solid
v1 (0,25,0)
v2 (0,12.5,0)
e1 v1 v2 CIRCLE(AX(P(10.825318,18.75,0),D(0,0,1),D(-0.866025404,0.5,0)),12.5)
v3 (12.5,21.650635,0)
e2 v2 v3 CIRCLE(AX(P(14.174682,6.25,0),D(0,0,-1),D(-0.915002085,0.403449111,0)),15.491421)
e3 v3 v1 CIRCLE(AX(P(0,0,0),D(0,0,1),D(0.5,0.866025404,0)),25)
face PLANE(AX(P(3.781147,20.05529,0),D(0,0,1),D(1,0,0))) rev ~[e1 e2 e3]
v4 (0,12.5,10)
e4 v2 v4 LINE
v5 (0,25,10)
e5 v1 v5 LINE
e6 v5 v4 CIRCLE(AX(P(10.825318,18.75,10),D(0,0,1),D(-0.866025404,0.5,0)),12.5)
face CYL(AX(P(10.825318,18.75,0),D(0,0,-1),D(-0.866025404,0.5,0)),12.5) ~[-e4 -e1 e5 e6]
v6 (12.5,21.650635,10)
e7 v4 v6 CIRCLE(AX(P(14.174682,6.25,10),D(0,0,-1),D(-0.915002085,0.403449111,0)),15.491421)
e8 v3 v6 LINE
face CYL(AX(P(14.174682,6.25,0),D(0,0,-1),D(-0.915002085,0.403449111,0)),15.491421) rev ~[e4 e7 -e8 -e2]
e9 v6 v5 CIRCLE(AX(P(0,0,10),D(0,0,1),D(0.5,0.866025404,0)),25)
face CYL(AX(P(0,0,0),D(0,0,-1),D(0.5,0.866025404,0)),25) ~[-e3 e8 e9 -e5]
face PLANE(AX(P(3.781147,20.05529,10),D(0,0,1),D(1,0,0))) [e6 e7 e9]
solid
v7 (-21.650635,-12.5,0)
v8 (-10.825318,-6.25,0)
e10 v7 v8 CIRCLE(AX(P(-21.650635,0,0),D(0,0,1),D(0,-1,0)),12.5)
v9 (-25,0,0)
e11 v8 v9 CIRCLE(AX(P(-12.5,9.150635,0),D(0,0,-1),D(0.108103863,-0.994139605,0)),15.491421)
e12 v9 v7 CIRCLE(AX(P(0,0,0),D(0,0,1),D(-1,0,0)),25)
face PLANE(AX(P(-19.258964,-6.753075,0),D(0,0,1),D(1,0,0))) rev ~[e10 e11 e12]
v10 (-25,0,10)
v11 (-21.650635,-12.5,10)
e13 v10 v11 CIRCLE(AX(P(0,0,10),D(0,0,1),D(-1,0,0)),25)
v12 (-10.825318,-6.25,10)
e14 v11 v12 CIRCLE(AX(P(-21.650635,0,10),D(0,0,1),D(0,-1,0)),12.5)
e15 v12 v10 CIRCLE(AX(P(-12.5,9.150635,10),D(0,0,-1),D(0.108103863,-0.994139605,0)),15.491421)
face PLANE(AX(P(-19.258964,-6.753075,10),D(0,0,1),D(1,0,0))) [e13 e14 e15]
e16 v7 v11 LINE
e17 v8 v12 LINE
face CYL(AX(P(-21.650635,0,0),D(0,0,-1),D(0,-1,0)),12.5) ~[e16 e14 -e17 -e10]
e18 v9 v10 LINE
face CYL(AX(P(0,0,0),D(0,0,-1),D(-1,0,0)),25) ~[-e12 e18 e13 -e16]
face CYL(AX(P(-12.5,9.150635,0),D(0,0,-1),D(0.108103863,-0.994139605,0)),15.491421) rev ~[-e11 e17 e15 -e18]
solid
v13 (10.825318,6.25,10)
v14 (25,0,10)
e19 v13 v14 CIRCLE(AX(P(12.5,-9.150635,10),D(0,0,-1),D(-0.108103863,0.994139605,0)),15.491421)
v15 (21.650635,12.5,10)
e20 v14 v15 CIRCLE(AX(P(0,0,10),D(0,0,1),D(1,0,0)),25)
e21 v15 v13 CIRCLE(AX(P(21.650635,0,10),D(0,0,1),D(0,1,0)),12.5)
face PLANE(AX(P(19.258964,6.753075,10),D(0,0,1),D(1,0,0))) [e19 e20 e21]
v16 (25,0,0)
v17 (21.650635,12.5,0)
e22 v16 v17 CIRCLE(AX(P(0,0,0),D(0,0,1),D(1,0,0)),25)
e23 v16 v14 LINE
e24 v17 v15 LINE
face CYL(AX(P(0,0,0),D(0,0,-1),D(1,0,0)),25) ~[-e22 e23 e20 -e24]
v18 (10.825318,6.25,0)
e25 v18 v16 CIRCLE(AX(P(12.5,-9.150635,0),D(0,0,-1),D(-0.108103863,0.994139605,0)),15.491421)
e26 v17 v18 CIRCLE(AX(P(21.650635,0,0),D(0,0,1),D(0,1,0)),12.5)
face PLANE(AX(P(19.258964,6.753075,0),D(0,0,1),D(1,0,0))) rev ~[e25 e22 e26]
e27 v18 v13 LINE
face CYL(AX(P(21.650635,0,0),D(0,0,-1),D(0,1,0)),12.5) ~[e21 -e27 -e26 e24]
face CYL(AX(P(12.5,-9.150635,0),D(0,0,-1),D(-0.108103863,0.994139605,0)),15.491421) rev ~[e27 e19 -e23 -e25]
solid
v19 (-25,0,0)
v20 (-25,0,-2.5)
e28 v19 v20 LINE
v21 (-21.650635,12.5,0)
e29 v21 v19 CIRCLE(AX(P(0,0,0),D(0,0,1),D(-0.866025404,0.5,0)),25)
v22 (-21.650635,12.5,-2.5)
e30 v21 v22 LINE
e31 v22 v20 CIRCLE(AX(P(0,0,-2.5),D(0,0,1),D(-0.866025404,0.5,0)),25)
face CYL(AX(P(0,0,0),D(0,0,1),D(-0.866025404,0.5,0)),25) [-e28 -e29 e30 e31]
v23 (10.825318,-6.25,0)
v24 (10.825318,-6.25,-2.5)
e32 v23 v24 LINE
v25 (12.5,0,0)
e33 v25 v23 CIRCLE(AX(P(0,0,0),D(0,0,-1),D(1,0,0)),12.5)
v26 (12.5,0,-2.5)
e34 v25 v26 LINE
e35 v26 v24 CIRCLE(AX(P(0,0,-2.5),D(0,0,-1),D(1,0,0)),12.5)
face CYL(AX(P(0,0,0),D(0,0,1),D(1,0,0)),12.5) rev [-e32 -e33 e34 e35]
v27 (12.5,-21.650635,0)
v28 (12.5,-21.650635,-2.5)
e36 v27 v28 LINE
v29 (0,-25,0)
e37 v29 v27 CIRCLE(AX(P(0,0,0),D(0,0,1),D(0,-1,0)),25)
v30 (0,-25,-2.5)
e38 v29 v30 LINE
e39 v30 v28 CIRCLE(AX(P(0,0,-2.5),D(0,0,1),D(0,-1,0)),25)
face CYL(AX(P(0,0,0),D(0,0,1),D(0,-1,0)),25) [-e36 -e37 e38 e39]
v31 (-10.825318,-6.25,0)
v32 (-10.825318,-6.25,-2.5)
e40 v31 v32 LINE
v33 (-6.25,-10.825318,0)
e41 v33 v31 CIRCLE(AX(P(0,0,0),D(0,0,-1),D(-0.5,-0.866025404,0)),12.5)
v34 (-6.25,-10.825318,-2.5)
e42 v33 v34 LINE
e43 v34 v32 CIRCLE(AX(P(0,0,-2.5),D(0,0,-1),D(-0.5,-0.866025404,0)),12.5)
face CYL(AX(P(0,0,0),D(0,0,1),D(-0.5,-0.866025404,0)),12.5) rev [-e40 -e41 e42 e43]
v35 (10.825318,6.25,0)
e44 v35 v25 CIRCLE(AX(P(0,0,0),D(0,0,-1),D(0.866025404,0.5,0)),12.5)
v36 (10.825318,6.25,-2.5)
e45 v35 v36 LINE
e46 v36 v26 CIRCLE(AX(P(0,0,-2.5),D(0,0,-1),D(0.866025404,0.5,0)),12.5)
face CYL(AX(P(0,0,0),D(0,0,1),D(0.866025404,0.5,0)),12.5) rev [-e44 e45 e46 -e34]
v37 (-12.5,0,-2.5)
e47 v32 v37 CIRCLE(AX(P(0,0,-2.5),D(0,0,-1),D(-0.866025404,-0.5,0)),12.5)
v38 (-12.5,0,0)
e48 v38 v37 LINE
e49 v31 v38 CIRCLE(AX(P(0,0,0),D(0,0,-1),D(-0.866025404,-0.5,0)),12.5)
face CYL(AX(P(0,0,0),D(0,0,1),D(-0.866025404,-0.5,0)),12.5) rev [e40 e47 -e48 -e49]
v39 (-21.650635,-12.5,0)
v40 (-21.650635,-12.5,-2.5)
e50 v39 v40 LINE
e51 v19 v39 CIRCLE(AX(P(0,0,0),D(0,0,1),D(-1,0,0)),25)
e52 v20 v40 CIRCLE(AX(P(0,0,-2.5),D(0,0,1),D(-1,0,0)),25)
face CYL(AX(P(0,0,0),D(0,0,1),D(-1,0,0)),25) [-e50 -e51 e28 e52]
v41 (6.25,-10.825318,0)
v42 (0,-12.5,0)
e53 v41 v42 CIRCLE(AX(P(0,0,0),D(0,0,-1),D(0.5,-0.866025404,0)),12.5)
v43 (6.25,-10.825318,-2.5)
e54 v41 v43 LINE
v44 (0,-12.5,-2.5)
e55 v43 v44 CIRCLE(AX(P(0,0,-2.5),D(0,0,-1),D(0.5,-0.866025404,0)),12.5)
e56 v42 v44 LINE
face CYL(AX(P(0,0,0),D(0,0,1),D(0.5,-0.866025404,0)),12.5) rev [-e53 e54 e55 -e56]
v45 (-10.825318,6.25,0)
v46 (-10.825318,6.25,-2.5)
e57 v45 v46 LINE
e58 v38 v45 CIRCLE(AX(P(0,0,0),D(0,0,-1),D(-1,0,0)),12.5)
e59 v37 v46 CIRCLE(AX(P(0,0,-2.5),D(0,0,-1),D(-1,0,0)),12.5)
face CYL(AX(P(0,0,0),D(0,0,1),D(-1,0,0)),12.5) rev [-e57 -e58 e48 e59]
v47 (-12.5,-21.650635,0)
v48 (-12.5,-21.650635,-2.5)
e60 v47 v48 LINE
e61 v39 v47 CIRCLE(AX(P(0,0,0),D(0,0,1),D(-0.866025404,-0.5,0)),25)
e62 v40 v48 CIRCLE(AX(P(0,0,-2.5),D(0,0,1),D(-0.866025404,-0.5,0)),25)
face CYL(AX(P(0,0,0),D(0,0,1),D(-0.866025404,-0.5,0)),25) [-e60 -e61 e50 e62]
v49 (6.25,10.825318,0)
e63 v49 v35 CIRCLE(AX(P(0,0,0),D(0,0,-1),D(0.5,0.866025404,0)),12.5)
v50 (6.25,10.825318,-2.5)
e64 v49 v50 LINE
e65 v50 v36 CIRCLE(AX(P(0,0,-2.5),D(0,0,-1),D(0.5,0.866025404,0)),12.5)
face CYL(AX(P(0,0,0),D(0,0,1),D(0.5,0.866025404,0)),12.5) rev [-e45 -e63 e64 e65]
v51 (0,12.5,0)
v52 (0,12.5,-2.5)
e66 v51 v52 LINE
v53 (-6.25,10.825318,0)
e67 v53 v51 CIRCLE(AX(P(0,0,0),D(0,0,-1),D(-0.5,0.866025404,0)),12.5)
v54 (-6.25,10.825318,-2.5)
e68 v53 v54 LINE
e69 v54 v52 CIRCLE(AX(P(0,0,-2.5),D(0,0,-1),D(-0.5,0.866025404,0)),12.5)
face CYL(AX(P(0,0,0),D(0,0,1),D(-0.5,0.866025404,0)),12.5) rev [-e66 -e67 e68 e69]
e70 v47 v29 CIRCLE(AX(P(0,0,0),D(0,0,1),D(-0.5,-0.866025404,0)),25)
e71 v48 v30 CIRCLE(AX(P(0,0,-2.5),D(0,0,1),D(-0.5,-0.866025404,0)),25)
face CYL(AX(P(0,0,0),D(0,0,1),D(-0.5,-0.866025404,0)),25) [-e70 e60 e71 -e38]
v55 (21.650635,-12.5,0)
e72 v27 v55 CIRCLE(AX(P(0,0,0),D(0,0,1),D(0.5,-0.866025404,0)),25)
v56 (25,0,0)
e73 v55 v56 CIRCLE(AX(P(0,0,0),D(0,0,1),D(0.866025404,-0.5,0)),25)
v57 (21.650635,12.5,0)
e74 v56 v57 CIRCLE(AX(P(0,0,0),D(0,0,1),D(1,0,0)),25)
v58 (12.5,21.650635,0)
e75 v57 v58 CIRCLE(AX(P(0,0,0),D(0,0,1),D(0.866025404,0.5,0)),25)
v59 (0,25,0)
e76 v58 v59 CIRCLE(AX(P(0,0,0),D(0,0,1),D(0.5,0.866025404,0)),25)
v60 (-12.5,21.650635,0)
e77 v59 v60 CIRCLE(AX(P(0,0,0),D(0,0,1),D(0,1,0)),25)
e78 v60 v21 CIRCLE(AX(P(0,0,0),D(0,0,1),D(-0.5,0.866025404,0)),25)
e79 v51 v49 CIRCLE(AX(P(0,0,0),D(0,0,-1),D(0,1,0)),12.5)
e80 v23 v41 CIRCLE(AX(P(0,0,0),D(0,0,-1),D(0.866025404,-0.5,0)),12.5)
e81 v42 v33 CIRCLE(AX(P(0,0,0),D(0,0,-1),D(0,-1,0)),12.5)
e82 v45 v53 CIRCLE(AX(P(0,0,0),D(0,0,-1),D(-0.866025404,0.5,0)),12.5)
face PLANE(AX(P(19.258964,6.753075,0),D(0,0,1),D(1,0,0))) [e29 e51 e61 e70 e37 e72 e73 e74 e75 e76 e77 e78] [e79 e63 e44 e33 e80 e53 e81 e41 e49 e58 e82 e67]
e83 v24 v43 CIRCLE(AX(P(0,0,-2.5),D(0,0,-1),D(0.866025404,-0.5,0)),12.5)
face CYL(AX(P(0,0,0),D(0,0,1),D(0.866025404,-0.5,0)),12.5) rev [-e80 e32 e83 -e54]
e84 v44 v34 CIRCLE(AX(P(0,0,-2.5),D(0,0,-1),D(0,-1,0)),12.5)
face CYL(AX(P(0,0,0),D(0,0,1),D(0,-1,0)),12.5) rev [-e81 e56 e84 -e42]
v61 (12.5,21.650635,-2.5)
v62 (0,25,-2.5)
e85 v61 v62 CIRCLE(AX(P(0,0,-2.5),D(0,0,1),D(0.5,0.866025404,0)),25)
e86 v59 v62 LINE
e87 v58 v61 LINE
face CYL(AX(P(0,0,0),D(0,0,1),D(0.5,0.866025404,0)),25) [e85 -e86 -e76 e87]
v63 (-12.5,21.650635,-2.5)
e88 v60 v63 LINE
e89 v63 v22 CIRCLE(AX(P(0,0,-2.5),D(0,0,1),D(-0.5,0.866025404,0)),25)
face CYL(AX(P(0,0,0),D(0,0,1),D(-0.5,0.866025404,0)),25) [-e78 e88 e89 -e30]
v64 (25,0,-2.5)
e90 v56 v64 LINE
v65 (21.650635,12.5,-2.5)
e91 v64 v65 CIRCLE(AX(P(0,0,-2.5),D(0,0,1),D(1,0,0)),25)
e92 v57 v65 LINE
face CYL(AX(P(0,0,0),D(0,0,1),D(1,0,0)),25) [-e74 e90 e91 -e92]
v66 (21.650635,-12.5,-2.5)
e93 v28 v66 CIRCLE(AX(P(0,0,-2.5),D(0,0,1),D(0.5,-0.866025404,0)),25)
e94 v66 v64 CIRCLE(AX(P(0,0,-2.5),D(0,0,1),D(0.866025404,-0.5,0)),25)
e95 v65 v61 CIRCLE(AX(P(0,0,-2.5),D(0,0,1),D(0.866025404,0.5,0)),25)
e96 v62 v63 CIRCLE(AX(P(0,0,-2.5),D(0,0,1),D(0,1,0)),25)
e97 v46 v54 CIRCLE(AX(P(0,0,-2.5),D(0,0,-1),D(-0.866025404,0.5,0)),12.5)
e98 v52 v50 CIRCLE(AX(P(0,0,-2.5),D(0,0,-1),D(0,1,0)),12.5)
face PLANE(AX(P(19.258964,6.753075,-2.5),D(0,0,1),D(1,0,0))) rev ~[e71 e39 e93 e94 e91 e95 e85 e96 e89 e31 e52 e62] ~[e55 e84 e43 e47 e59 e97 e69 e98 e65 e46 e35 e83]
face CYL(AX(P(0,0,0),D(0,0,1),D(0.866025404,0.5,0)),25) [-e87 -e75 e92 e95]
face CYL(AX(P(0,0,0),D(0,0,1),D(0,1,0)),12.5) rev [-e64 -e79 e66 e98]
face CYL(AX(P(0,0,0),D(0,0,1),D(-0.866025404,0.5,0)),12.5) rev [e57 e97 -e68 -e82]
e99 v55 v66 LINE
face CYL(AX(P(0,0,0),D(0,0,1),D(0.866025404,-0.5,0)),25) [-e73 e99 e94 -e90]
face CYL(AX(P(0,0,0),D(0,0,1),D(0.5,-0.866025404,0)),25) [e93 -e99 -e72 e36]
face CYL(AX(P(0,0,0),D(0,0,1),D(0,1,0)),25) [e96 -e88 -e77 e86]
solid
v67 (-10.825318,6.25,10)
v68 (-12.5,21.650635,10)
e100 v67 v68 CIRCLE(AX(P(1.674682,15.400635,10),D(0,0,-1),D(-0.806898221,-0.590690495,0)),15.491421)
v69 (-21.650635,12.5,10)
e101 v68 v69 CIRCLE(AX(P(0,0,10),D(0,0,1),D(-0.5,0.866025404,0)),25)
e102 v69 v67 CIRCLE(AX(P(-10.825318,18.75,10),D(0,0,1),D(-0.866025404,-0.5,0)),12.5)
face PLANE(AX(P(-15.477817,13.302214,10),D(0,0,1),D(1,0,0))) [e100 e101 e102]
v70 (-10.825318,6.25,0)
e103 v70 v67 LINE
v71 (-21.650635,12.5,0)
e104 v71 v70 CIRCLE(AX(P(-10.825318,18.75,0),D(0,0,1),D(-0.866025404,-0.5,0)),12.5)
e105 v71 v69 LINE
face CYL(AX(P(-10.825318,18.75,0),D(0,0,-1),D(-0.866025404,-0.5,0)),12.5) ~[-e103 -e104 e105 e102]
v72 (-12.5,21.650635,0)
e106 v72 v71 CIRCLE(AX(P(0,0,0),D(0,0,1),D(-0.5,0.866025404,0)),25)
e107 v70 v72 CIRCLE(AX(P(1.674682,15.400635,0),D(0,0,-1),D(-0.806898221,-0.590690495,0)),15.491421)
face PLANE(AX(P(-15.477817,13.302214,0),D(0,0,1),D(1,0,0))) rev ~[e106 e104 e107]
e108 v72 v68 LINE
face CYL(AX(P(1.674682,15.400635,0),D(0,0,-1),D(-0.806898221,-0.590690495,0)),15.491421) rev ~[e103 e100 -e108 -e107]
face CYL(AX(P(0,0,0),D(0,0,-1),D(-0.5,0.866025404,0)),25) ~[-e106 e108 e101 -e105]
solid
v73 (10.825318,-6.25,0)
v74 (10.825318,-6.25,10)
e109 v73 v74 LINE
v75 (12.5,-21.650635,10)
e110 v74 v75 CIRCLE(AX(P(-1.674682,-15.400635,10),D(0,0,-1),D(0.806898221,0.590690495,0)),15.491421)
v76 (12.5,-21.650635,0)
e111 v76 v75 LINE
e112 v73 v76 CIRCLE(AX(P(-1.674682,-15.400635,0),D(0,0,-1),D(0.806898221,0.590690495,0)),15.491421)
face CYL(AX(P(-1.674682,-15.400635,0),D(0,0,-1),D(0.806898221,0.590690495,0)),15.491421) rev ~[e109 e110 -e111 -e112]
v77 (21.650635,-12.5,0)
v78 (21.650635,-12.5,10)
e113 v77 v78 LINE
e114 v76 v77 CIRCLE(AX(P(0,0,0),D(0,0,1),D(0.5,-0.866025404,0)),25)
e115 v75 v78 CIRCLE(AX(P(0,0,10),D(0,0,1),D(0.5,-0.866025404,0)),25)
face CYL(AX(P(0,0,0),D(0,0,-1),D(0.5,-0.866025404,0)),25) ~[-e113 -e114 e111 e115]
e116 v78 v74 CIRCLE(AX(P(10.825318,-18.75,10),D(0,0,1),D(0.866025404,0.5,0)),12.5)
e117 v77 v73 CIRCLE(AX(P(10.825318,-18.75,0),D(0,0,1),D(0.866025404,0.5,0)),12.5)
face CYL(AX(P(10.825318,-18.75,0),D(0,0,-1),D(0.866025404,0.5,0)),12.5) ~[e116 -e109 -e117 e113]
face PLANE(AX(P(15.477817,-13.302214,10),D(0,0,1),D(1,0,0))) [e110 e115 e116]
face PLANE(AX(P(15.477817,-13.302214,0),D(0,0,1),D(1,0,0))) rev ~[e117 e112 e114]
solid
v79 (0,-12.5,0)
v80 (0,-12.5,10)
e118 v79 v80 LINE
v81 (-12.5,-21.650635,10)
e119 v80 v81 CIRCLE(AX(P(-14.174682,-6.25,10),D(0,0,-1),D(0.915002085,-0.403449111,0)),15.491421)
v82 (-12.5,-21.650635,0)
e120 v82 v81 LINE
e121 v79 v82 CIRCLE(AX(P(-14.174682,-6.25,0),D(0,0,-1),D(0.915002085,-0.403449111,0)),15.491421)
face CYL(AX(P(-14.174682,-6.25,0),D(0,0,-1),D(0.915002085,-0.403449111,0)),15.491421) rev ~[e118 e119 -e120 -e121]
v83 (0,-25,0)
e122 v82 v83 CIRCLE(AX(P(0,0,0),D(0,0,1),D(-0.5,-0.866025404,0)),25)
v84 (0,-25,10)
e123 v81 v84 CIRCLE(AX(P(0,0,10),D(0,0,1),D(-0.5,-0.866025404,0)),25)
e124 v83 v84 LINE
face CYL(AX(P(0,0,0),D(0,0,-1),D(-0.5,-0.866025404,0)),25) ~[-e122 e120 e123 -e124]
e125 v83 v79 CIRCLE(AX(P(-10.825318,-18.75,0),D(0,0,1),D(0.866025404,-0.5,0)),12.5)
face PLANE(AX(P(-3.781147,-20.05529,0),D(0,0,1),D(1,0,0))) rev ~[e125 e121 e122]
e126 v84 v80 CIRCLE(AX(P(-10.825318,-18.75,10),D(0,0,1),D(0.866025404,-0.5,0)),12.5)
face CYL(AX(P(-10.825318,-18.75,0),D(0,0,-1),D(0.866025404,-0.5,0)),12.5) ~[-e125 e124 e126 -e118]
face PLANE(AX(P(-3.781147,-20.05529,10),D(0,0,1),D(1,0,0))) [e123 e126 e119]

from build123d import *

# Parameters (mm, degrees)
F1_DEPTH = 10
F2_DEPTH = 2.5


with BuildPart() as f1:
    # F0 (on Top) → F1 (new body)
    with BuildSketch(Plane.XY):
        with BuildLine():
            ThreePointArc((10.8253175473, 6.25), (18.75, 5.0240473581), (25, 0))
            ThreePointArc((25, 0), (24.1481456572, 6.4704761276), (21.6506350946, 12.5))
            ThreePointArc((21.6506350946, 12.5), (15.4006350946, 10.8253175473), (10.8253175473, 6.25))
        make_face()
    extrude(amount=F1_DEPTH)


with BuildPart() as f1b:
    # F0 (on Top) → F1, piece 2 (new body)
    with BuildSketch(Plane.XY):
        with BuildLine():
            ThreePointArc((12.5, -21.6506350946), (17.6776695297, -17.6776695297), (21.6506350946, -12.5))
            ThreePointArc((21.6506350946, -12.5), (17.0753175473, -7.9246824527), (10.8253175473, -6.25))
            ThreePointArc((10.8253175473, -6.25), (13.7259526419, -13.7259526419), (12.5, -21.6506350946))
        make_face()
    extrude(amount=F1_DEPTH)


with BuildPart() as f1c:
    # F0 (on Top) → F1, piece 3 (new body)
    with BuildSketch(Plane.XY):
        with BuildLine():
            ThreePointArc((0, 12.5), (5.0240473581, 18.75), (12.5, 21.6506350946))
            ThreePointArc((12.5, 21.6506350946), (6.4704761276, 24.1481456572), (0, 25))
            ThreePointArc((0, 25), (-1.6746824527, 18.75), (0, 12.5))
        make_face()
    extrude(amount=F1_DEPTH)


with BuildPart() as f1d:
    # F0 (on Top) → F1, piece 4 (new body)
    with BuildSketch(Plane.XY):
        with BuildLine():
            ThreePointArc((-12.5, -21.6506350946), (-6.4704761276, -24.1481456572), (0, -25))
            ThreePointArc((0, -25), (1.6746824527, -18.75), (0, -12.5))
            ThreePointArc((0, -12.5), (-5.0240473581, -18.75), (-12.5, -21.6506350946))
        make_face()
    extrude(amount=F1_DEPTH)


with BuildPart() as f1e:
    # F0 (on Top) → F1, piece 5 (new body)
    with BuildSketch(Plane.XY):
        with BuildLine():
            ThreePointArc((-21.6506350946, 12.5), (-17.0753175473, 7.9246824527), (-10.8253175473, 6.25))
            ThreePointArc((-10.8253175473, 6.25), (-13.7259526419, 13.7259526419), (-12.5, 21.6506350946))
            ThreePointArc((-12.5, 21.6506350946), (-17.6776695297, 17.6776695297), (-21.6506350946, 12.5))
        make_face()
    extrude(amount=F1_DEPTH)


with BuildPart() as f1f:
    # F0 (on Top) → F1, piece 6 (new body)
    with BuildSketch(Plane.XY):
        with BuildLine():
            ThreePointArc((-21.6506350946, -12.5), (-15.4006350946, -10.8253175473), (-10.8253175473, -6.25))
            ThreePointArc((-10.8253175473, -6.25), (-18.75, -5.0240473581), (-25, 0))
            ThreePointArc((-25, 0), (-24.1481456572, -6.4704761276), (-21.6506350946, -12.5))
        make_face()
    extrude(amount=F1_DEPTH)


with BuildPart() as f2:
    # F0 (on Top) → F2 (new body)
    with BuildSketch(Plane.XY):
        with BuildLine():
            ThreePointArc((10.8253175473, 6.25), (18.75, 5.0240473581), (25, 0))
            ThreePointArc((25, 0), (24.1481456572, 6.4704761276), (21.6506350946, 12.5))
            ThreePointArc((21.6506350946, 12.5), (15.4006350946, 10.8253175473), (10.8253175473, 6.25))
        make_face()
        with BuildLine():
            ThreePointArc((21.6506350946, -12.5), (24.1481456572, -6.4704761276), (25, 0))
            Line((25, 0), (12.5, 0))
            ThreePointArc((12.5, 0), (18.75, -5.0240473581), (21.6506350946, -12.5))
        make_face()
        with BuildLine():
            Line((12.5, 0), (25, 0))
            ThreePointArc((25, 0), (18.75, 5.0240473581), (10.8253175473, 6.25))
            ThreePointArc((10.8253175473, 6.25), (12.0740728286, 3.2352380638), (12.5, 0))
        make_face()
        with BuildLine():
            ThreePointArc((6.25, 10.8253175473), (13.7259526419, 13.7259526419), (21.6506350946, 12.5))
            ThreePointArc((21.6506350946, 12.5), (17.6776695297, 17.6776695297), (12.5, 21.6506350946))
            Line((12.5, 21.6506350946), (6.25, 10.8253175473))
        make_face()
        with BuildLine():
            ThreePointArc((10.8253175473, 6.25), (15.4006350946, 10.8253175473), (21.6506350946, 12.5))
            ThreePointArc((21.6506350946, 12.5), (13.7259526419, 13.7259526419), (6.25, 10.8253175473))
            ThreePointArc((6.25, 10.8253175473), (8.8388347648, 8.8388347648), (10.8253175473, 6.25))
        make_face()
        with BuildLine():
            ThreePointArc((10.8253175473, -6.25), (17.0753175473, -7.9246824527), (21.6506350946, -12.5))
            ThreePointArc((21.6506350946, -12.5), (18.75, -5.0240473581), (12.5, 0))
            ThreePointArc((12.5, 0), (12.0740728286, -3.2352380638), (10.8253175473, -6.25))
        make_face()
        with BuildLine():
            ThreePointArc((12.5, -21.6506350946), (17.6776695297, -17.6776695297), (21.6506350946, -12.5))
            ThreePointArc((21.6506350946, -12.5), (17.0753175473, -7.9246824527), (10.8253175473, -6.25))
            ThreePointArc((10.8253175473, -6.25), (13.7259526419, -13.7259526419), (12.5, -21.6506350946))
        make_face()
        with BuildLine():
            ThreePointArc((0, 12.5), (5.0240473581, 18.75), (12.5, 21.6506350946))
            ThreePointArc((12.5, 21.6506350946), (6.4704761276, 24.1481456572), (0, 25))
            ThreePointArc((0, 25), (-1.6746824527, 18.75), (0, 12.5))
        make_face()
        with BuildLine():
            Line((6.25, 10.8253175473), (12.5, 21.6506350946))
            ThreePointArc((12.5, 21.6506350946), (5.0240473581, 18.75), (0, 12.5))
            ThreePointArc((0, 12.5), (3.2352380638, 12.0740728286), (6.25, 10.8253175473))
        make_face()
        with BuildLine():
            ThreePointArc((0, -25), (6.4704761276, -24.1481456572), (12.5, -21.6506350946))
            Line((12.5, -21.6506350946), (6.25, -10.8253175473))
            ThreePointArc((6.25, -10.8253175473), (5.0240473581, -18.75), (0, -25))
        make_face()
        with BuildLine():
            Line((6.25, -10.8253175473), (12.5, -21.6506350946))
            ThreePointArc((12.5, -21.6506350946), (13.7259526419, -13.7259526419), (10.8253175473, -6.25))
            ThreePointArc((10.8253175473, -6.25), (8.8388347648, -8.8388347648), (6.25, -10.8253175473))
        make_face()
        with BuildLine():
            ThreePointArc((-6.25, 10.8253175473), (-5.0240473581, 18.75), (0, 25))
            ThreePointArc((0, 25), (-6.4704761276, 24.1481456572), (-12.5, 21.6506350946))
            Line((-12.5, 21.6506350946), (-6.25, 10.8253175473))
        make_face()
        with BuildLine():
            ThreePointArc((0, 12.5), (-1.6746824527, 18.75), (0, 25))
            ThreePointArc((0, 25), (-5.0240473581, 18.75), (-6.25, 10.8253175473))
            ThreePointArc((-6.25, 10.8253175473), (-3.2352380638, 12.0740728286), (0, 12.5))
        make_face()
        with BuildLine():
            ThreePointArc((0, -12.5), (1.6746824527, -18.75), (0, -25))
            ThreePointArc((0, -25), (5.0240473581, -18.75), (6.25, -10.8253175473))
            ThreePointArc((6.25, -10.8253175473), (3.2352380638, -12.0740728286), (0, -12.5))
        make_face()
        with BuildLine():
            ThreePointArc((-12.5, -21.6506350946), (-6.4704761276, -24.1481456572), (0, -25))
            ThreePointArc((0, -25), (1.6746824527, -18.75), (0, -12.5))
            ThreePointArc((0, -12.5), (-5.0240473581, -18.75), (-12.5, -21.6506350946))
        make_face()
        with BuildLine():
            ThreePointArc((-12.5, 21.6506350946), (-13.7259526419, 13.7259526419), (-10.8253175473, 6.25))
            ThreePointArc((-10.8253175473, 6.25), (-8.8388347648, 8.8388347648), (-6.25, 10.8253175473))
            Line((-6.25, 10.8253175473), (-12.5, 21.6506350946))
        make_face()
        with BuildLine():
            ThreePointArc((-21.6506350946, 12.5), (-17.0753175473, 7.9246824527), (-10.8253175473, 6.25))
            ThreePointArc((-10.8253175473, 6.25), (-13.7259526419, 13.7259526419), (-12.5, 21.6506350946))
            ThreePointArc((-12.5, 21.6506350946), (-17.6776695297, 17.6776695297), (-21.6506350946, 12.5))
        make_face()
        with BuildLine():
            ThreePointArc((-12.5, 0), (-12.0740728286, 3.2352380638), (-10.8253175473, 6.25))
            ThreePointArc((-10.8253175473, 6.25), (-17.0753175473, 7.9246824527), (-21.6506350946, 12.5))
            ThreePointArc((-21.6506350946, 12.5), (-18.75, 5.0240473581), (-12.5, 0))
        make_face()
        with BuildLine():
            ThreePointArc((-25, 0), (-18.75, -5.0240473581), (-10.8253175473, -6.25))
            ThreePointArc((-10.8253175473, -6.25), (-12.0740728286, -3.2352380638), (-12.5, 0))
            Line((-12.5, 0), (-25, 0))
        make_face()
        with BuildLine():
            ThreePointArc((-21.6506350946, -12.5), (-15.4006350946, -10.8253175473), (-10.8253175473, -6.25))
            ThreePointArc((-10.8253175473, -6.25), (-18.75, -5.0240473581), (-25, 0))
            ThreePointArc((-25, 0), (-24.1481456572, -6.4704761276), (-21.6506350946, -12.5))
        make_face()
        with BuildLine():
            ThreePointArc((-6.25, -10.8253175473), (-8.8388347648, -8.8388347648), (-10.8253175473, -6.25))
            ThreePointArc((-10.8253175473, -6.25), (-15.4006350946, -10.8253175473), (-21.6506350946, -12.5))
            ThreePointArc((-21.6506350946, -12.5), (-13.7259526419, -13.7259526419), (-6.25, -10.8253175473))
        make_face()
        with BuildLine():
            ThreePointArc((-12.5, -21.6506350946), (-5.0240473581, -18.75), (0, -12.5))
            ThreePointArc((0, -12.5), (-3.2352380638, -12.0740728286), (-6.25, -10.8253175473))
            Line((-6.25, -10.8253175473), (-12.5, -21.6506350946))
        make_face()
        with BuildLine():
            ThreePointArc((-21.6506350946, -12.5), (-17.6776695297, -17.6776695297), (-12.5, -21.6506350946))
            Line((-12.5, -21.6506350946), (-6.25, -10.8253175473))
            ThreePointArc((-6.25, -10.8253175473), (-13.7259526419, -13.7259526419), (-21.6506350946, -12.5))
        make_face()
        with BuildLine():
            Line((-25, 0), (-12.5, 0))
            ThreePointArc((-12.5, 0), (-18.75, 5.0240473581), (-21.6506350946, 12.5))
            ThreePointArc((-21.6506350946, 12.5), (-24.1481456572, 6.4704761276), (-25, 0))
        make_face()
    extrude(amount=-F2_DEPTH)


solid = Compound([f1.part, f1b.part, f1c.part, f1d.part, f1e.part, f1f.part, f2.part])
